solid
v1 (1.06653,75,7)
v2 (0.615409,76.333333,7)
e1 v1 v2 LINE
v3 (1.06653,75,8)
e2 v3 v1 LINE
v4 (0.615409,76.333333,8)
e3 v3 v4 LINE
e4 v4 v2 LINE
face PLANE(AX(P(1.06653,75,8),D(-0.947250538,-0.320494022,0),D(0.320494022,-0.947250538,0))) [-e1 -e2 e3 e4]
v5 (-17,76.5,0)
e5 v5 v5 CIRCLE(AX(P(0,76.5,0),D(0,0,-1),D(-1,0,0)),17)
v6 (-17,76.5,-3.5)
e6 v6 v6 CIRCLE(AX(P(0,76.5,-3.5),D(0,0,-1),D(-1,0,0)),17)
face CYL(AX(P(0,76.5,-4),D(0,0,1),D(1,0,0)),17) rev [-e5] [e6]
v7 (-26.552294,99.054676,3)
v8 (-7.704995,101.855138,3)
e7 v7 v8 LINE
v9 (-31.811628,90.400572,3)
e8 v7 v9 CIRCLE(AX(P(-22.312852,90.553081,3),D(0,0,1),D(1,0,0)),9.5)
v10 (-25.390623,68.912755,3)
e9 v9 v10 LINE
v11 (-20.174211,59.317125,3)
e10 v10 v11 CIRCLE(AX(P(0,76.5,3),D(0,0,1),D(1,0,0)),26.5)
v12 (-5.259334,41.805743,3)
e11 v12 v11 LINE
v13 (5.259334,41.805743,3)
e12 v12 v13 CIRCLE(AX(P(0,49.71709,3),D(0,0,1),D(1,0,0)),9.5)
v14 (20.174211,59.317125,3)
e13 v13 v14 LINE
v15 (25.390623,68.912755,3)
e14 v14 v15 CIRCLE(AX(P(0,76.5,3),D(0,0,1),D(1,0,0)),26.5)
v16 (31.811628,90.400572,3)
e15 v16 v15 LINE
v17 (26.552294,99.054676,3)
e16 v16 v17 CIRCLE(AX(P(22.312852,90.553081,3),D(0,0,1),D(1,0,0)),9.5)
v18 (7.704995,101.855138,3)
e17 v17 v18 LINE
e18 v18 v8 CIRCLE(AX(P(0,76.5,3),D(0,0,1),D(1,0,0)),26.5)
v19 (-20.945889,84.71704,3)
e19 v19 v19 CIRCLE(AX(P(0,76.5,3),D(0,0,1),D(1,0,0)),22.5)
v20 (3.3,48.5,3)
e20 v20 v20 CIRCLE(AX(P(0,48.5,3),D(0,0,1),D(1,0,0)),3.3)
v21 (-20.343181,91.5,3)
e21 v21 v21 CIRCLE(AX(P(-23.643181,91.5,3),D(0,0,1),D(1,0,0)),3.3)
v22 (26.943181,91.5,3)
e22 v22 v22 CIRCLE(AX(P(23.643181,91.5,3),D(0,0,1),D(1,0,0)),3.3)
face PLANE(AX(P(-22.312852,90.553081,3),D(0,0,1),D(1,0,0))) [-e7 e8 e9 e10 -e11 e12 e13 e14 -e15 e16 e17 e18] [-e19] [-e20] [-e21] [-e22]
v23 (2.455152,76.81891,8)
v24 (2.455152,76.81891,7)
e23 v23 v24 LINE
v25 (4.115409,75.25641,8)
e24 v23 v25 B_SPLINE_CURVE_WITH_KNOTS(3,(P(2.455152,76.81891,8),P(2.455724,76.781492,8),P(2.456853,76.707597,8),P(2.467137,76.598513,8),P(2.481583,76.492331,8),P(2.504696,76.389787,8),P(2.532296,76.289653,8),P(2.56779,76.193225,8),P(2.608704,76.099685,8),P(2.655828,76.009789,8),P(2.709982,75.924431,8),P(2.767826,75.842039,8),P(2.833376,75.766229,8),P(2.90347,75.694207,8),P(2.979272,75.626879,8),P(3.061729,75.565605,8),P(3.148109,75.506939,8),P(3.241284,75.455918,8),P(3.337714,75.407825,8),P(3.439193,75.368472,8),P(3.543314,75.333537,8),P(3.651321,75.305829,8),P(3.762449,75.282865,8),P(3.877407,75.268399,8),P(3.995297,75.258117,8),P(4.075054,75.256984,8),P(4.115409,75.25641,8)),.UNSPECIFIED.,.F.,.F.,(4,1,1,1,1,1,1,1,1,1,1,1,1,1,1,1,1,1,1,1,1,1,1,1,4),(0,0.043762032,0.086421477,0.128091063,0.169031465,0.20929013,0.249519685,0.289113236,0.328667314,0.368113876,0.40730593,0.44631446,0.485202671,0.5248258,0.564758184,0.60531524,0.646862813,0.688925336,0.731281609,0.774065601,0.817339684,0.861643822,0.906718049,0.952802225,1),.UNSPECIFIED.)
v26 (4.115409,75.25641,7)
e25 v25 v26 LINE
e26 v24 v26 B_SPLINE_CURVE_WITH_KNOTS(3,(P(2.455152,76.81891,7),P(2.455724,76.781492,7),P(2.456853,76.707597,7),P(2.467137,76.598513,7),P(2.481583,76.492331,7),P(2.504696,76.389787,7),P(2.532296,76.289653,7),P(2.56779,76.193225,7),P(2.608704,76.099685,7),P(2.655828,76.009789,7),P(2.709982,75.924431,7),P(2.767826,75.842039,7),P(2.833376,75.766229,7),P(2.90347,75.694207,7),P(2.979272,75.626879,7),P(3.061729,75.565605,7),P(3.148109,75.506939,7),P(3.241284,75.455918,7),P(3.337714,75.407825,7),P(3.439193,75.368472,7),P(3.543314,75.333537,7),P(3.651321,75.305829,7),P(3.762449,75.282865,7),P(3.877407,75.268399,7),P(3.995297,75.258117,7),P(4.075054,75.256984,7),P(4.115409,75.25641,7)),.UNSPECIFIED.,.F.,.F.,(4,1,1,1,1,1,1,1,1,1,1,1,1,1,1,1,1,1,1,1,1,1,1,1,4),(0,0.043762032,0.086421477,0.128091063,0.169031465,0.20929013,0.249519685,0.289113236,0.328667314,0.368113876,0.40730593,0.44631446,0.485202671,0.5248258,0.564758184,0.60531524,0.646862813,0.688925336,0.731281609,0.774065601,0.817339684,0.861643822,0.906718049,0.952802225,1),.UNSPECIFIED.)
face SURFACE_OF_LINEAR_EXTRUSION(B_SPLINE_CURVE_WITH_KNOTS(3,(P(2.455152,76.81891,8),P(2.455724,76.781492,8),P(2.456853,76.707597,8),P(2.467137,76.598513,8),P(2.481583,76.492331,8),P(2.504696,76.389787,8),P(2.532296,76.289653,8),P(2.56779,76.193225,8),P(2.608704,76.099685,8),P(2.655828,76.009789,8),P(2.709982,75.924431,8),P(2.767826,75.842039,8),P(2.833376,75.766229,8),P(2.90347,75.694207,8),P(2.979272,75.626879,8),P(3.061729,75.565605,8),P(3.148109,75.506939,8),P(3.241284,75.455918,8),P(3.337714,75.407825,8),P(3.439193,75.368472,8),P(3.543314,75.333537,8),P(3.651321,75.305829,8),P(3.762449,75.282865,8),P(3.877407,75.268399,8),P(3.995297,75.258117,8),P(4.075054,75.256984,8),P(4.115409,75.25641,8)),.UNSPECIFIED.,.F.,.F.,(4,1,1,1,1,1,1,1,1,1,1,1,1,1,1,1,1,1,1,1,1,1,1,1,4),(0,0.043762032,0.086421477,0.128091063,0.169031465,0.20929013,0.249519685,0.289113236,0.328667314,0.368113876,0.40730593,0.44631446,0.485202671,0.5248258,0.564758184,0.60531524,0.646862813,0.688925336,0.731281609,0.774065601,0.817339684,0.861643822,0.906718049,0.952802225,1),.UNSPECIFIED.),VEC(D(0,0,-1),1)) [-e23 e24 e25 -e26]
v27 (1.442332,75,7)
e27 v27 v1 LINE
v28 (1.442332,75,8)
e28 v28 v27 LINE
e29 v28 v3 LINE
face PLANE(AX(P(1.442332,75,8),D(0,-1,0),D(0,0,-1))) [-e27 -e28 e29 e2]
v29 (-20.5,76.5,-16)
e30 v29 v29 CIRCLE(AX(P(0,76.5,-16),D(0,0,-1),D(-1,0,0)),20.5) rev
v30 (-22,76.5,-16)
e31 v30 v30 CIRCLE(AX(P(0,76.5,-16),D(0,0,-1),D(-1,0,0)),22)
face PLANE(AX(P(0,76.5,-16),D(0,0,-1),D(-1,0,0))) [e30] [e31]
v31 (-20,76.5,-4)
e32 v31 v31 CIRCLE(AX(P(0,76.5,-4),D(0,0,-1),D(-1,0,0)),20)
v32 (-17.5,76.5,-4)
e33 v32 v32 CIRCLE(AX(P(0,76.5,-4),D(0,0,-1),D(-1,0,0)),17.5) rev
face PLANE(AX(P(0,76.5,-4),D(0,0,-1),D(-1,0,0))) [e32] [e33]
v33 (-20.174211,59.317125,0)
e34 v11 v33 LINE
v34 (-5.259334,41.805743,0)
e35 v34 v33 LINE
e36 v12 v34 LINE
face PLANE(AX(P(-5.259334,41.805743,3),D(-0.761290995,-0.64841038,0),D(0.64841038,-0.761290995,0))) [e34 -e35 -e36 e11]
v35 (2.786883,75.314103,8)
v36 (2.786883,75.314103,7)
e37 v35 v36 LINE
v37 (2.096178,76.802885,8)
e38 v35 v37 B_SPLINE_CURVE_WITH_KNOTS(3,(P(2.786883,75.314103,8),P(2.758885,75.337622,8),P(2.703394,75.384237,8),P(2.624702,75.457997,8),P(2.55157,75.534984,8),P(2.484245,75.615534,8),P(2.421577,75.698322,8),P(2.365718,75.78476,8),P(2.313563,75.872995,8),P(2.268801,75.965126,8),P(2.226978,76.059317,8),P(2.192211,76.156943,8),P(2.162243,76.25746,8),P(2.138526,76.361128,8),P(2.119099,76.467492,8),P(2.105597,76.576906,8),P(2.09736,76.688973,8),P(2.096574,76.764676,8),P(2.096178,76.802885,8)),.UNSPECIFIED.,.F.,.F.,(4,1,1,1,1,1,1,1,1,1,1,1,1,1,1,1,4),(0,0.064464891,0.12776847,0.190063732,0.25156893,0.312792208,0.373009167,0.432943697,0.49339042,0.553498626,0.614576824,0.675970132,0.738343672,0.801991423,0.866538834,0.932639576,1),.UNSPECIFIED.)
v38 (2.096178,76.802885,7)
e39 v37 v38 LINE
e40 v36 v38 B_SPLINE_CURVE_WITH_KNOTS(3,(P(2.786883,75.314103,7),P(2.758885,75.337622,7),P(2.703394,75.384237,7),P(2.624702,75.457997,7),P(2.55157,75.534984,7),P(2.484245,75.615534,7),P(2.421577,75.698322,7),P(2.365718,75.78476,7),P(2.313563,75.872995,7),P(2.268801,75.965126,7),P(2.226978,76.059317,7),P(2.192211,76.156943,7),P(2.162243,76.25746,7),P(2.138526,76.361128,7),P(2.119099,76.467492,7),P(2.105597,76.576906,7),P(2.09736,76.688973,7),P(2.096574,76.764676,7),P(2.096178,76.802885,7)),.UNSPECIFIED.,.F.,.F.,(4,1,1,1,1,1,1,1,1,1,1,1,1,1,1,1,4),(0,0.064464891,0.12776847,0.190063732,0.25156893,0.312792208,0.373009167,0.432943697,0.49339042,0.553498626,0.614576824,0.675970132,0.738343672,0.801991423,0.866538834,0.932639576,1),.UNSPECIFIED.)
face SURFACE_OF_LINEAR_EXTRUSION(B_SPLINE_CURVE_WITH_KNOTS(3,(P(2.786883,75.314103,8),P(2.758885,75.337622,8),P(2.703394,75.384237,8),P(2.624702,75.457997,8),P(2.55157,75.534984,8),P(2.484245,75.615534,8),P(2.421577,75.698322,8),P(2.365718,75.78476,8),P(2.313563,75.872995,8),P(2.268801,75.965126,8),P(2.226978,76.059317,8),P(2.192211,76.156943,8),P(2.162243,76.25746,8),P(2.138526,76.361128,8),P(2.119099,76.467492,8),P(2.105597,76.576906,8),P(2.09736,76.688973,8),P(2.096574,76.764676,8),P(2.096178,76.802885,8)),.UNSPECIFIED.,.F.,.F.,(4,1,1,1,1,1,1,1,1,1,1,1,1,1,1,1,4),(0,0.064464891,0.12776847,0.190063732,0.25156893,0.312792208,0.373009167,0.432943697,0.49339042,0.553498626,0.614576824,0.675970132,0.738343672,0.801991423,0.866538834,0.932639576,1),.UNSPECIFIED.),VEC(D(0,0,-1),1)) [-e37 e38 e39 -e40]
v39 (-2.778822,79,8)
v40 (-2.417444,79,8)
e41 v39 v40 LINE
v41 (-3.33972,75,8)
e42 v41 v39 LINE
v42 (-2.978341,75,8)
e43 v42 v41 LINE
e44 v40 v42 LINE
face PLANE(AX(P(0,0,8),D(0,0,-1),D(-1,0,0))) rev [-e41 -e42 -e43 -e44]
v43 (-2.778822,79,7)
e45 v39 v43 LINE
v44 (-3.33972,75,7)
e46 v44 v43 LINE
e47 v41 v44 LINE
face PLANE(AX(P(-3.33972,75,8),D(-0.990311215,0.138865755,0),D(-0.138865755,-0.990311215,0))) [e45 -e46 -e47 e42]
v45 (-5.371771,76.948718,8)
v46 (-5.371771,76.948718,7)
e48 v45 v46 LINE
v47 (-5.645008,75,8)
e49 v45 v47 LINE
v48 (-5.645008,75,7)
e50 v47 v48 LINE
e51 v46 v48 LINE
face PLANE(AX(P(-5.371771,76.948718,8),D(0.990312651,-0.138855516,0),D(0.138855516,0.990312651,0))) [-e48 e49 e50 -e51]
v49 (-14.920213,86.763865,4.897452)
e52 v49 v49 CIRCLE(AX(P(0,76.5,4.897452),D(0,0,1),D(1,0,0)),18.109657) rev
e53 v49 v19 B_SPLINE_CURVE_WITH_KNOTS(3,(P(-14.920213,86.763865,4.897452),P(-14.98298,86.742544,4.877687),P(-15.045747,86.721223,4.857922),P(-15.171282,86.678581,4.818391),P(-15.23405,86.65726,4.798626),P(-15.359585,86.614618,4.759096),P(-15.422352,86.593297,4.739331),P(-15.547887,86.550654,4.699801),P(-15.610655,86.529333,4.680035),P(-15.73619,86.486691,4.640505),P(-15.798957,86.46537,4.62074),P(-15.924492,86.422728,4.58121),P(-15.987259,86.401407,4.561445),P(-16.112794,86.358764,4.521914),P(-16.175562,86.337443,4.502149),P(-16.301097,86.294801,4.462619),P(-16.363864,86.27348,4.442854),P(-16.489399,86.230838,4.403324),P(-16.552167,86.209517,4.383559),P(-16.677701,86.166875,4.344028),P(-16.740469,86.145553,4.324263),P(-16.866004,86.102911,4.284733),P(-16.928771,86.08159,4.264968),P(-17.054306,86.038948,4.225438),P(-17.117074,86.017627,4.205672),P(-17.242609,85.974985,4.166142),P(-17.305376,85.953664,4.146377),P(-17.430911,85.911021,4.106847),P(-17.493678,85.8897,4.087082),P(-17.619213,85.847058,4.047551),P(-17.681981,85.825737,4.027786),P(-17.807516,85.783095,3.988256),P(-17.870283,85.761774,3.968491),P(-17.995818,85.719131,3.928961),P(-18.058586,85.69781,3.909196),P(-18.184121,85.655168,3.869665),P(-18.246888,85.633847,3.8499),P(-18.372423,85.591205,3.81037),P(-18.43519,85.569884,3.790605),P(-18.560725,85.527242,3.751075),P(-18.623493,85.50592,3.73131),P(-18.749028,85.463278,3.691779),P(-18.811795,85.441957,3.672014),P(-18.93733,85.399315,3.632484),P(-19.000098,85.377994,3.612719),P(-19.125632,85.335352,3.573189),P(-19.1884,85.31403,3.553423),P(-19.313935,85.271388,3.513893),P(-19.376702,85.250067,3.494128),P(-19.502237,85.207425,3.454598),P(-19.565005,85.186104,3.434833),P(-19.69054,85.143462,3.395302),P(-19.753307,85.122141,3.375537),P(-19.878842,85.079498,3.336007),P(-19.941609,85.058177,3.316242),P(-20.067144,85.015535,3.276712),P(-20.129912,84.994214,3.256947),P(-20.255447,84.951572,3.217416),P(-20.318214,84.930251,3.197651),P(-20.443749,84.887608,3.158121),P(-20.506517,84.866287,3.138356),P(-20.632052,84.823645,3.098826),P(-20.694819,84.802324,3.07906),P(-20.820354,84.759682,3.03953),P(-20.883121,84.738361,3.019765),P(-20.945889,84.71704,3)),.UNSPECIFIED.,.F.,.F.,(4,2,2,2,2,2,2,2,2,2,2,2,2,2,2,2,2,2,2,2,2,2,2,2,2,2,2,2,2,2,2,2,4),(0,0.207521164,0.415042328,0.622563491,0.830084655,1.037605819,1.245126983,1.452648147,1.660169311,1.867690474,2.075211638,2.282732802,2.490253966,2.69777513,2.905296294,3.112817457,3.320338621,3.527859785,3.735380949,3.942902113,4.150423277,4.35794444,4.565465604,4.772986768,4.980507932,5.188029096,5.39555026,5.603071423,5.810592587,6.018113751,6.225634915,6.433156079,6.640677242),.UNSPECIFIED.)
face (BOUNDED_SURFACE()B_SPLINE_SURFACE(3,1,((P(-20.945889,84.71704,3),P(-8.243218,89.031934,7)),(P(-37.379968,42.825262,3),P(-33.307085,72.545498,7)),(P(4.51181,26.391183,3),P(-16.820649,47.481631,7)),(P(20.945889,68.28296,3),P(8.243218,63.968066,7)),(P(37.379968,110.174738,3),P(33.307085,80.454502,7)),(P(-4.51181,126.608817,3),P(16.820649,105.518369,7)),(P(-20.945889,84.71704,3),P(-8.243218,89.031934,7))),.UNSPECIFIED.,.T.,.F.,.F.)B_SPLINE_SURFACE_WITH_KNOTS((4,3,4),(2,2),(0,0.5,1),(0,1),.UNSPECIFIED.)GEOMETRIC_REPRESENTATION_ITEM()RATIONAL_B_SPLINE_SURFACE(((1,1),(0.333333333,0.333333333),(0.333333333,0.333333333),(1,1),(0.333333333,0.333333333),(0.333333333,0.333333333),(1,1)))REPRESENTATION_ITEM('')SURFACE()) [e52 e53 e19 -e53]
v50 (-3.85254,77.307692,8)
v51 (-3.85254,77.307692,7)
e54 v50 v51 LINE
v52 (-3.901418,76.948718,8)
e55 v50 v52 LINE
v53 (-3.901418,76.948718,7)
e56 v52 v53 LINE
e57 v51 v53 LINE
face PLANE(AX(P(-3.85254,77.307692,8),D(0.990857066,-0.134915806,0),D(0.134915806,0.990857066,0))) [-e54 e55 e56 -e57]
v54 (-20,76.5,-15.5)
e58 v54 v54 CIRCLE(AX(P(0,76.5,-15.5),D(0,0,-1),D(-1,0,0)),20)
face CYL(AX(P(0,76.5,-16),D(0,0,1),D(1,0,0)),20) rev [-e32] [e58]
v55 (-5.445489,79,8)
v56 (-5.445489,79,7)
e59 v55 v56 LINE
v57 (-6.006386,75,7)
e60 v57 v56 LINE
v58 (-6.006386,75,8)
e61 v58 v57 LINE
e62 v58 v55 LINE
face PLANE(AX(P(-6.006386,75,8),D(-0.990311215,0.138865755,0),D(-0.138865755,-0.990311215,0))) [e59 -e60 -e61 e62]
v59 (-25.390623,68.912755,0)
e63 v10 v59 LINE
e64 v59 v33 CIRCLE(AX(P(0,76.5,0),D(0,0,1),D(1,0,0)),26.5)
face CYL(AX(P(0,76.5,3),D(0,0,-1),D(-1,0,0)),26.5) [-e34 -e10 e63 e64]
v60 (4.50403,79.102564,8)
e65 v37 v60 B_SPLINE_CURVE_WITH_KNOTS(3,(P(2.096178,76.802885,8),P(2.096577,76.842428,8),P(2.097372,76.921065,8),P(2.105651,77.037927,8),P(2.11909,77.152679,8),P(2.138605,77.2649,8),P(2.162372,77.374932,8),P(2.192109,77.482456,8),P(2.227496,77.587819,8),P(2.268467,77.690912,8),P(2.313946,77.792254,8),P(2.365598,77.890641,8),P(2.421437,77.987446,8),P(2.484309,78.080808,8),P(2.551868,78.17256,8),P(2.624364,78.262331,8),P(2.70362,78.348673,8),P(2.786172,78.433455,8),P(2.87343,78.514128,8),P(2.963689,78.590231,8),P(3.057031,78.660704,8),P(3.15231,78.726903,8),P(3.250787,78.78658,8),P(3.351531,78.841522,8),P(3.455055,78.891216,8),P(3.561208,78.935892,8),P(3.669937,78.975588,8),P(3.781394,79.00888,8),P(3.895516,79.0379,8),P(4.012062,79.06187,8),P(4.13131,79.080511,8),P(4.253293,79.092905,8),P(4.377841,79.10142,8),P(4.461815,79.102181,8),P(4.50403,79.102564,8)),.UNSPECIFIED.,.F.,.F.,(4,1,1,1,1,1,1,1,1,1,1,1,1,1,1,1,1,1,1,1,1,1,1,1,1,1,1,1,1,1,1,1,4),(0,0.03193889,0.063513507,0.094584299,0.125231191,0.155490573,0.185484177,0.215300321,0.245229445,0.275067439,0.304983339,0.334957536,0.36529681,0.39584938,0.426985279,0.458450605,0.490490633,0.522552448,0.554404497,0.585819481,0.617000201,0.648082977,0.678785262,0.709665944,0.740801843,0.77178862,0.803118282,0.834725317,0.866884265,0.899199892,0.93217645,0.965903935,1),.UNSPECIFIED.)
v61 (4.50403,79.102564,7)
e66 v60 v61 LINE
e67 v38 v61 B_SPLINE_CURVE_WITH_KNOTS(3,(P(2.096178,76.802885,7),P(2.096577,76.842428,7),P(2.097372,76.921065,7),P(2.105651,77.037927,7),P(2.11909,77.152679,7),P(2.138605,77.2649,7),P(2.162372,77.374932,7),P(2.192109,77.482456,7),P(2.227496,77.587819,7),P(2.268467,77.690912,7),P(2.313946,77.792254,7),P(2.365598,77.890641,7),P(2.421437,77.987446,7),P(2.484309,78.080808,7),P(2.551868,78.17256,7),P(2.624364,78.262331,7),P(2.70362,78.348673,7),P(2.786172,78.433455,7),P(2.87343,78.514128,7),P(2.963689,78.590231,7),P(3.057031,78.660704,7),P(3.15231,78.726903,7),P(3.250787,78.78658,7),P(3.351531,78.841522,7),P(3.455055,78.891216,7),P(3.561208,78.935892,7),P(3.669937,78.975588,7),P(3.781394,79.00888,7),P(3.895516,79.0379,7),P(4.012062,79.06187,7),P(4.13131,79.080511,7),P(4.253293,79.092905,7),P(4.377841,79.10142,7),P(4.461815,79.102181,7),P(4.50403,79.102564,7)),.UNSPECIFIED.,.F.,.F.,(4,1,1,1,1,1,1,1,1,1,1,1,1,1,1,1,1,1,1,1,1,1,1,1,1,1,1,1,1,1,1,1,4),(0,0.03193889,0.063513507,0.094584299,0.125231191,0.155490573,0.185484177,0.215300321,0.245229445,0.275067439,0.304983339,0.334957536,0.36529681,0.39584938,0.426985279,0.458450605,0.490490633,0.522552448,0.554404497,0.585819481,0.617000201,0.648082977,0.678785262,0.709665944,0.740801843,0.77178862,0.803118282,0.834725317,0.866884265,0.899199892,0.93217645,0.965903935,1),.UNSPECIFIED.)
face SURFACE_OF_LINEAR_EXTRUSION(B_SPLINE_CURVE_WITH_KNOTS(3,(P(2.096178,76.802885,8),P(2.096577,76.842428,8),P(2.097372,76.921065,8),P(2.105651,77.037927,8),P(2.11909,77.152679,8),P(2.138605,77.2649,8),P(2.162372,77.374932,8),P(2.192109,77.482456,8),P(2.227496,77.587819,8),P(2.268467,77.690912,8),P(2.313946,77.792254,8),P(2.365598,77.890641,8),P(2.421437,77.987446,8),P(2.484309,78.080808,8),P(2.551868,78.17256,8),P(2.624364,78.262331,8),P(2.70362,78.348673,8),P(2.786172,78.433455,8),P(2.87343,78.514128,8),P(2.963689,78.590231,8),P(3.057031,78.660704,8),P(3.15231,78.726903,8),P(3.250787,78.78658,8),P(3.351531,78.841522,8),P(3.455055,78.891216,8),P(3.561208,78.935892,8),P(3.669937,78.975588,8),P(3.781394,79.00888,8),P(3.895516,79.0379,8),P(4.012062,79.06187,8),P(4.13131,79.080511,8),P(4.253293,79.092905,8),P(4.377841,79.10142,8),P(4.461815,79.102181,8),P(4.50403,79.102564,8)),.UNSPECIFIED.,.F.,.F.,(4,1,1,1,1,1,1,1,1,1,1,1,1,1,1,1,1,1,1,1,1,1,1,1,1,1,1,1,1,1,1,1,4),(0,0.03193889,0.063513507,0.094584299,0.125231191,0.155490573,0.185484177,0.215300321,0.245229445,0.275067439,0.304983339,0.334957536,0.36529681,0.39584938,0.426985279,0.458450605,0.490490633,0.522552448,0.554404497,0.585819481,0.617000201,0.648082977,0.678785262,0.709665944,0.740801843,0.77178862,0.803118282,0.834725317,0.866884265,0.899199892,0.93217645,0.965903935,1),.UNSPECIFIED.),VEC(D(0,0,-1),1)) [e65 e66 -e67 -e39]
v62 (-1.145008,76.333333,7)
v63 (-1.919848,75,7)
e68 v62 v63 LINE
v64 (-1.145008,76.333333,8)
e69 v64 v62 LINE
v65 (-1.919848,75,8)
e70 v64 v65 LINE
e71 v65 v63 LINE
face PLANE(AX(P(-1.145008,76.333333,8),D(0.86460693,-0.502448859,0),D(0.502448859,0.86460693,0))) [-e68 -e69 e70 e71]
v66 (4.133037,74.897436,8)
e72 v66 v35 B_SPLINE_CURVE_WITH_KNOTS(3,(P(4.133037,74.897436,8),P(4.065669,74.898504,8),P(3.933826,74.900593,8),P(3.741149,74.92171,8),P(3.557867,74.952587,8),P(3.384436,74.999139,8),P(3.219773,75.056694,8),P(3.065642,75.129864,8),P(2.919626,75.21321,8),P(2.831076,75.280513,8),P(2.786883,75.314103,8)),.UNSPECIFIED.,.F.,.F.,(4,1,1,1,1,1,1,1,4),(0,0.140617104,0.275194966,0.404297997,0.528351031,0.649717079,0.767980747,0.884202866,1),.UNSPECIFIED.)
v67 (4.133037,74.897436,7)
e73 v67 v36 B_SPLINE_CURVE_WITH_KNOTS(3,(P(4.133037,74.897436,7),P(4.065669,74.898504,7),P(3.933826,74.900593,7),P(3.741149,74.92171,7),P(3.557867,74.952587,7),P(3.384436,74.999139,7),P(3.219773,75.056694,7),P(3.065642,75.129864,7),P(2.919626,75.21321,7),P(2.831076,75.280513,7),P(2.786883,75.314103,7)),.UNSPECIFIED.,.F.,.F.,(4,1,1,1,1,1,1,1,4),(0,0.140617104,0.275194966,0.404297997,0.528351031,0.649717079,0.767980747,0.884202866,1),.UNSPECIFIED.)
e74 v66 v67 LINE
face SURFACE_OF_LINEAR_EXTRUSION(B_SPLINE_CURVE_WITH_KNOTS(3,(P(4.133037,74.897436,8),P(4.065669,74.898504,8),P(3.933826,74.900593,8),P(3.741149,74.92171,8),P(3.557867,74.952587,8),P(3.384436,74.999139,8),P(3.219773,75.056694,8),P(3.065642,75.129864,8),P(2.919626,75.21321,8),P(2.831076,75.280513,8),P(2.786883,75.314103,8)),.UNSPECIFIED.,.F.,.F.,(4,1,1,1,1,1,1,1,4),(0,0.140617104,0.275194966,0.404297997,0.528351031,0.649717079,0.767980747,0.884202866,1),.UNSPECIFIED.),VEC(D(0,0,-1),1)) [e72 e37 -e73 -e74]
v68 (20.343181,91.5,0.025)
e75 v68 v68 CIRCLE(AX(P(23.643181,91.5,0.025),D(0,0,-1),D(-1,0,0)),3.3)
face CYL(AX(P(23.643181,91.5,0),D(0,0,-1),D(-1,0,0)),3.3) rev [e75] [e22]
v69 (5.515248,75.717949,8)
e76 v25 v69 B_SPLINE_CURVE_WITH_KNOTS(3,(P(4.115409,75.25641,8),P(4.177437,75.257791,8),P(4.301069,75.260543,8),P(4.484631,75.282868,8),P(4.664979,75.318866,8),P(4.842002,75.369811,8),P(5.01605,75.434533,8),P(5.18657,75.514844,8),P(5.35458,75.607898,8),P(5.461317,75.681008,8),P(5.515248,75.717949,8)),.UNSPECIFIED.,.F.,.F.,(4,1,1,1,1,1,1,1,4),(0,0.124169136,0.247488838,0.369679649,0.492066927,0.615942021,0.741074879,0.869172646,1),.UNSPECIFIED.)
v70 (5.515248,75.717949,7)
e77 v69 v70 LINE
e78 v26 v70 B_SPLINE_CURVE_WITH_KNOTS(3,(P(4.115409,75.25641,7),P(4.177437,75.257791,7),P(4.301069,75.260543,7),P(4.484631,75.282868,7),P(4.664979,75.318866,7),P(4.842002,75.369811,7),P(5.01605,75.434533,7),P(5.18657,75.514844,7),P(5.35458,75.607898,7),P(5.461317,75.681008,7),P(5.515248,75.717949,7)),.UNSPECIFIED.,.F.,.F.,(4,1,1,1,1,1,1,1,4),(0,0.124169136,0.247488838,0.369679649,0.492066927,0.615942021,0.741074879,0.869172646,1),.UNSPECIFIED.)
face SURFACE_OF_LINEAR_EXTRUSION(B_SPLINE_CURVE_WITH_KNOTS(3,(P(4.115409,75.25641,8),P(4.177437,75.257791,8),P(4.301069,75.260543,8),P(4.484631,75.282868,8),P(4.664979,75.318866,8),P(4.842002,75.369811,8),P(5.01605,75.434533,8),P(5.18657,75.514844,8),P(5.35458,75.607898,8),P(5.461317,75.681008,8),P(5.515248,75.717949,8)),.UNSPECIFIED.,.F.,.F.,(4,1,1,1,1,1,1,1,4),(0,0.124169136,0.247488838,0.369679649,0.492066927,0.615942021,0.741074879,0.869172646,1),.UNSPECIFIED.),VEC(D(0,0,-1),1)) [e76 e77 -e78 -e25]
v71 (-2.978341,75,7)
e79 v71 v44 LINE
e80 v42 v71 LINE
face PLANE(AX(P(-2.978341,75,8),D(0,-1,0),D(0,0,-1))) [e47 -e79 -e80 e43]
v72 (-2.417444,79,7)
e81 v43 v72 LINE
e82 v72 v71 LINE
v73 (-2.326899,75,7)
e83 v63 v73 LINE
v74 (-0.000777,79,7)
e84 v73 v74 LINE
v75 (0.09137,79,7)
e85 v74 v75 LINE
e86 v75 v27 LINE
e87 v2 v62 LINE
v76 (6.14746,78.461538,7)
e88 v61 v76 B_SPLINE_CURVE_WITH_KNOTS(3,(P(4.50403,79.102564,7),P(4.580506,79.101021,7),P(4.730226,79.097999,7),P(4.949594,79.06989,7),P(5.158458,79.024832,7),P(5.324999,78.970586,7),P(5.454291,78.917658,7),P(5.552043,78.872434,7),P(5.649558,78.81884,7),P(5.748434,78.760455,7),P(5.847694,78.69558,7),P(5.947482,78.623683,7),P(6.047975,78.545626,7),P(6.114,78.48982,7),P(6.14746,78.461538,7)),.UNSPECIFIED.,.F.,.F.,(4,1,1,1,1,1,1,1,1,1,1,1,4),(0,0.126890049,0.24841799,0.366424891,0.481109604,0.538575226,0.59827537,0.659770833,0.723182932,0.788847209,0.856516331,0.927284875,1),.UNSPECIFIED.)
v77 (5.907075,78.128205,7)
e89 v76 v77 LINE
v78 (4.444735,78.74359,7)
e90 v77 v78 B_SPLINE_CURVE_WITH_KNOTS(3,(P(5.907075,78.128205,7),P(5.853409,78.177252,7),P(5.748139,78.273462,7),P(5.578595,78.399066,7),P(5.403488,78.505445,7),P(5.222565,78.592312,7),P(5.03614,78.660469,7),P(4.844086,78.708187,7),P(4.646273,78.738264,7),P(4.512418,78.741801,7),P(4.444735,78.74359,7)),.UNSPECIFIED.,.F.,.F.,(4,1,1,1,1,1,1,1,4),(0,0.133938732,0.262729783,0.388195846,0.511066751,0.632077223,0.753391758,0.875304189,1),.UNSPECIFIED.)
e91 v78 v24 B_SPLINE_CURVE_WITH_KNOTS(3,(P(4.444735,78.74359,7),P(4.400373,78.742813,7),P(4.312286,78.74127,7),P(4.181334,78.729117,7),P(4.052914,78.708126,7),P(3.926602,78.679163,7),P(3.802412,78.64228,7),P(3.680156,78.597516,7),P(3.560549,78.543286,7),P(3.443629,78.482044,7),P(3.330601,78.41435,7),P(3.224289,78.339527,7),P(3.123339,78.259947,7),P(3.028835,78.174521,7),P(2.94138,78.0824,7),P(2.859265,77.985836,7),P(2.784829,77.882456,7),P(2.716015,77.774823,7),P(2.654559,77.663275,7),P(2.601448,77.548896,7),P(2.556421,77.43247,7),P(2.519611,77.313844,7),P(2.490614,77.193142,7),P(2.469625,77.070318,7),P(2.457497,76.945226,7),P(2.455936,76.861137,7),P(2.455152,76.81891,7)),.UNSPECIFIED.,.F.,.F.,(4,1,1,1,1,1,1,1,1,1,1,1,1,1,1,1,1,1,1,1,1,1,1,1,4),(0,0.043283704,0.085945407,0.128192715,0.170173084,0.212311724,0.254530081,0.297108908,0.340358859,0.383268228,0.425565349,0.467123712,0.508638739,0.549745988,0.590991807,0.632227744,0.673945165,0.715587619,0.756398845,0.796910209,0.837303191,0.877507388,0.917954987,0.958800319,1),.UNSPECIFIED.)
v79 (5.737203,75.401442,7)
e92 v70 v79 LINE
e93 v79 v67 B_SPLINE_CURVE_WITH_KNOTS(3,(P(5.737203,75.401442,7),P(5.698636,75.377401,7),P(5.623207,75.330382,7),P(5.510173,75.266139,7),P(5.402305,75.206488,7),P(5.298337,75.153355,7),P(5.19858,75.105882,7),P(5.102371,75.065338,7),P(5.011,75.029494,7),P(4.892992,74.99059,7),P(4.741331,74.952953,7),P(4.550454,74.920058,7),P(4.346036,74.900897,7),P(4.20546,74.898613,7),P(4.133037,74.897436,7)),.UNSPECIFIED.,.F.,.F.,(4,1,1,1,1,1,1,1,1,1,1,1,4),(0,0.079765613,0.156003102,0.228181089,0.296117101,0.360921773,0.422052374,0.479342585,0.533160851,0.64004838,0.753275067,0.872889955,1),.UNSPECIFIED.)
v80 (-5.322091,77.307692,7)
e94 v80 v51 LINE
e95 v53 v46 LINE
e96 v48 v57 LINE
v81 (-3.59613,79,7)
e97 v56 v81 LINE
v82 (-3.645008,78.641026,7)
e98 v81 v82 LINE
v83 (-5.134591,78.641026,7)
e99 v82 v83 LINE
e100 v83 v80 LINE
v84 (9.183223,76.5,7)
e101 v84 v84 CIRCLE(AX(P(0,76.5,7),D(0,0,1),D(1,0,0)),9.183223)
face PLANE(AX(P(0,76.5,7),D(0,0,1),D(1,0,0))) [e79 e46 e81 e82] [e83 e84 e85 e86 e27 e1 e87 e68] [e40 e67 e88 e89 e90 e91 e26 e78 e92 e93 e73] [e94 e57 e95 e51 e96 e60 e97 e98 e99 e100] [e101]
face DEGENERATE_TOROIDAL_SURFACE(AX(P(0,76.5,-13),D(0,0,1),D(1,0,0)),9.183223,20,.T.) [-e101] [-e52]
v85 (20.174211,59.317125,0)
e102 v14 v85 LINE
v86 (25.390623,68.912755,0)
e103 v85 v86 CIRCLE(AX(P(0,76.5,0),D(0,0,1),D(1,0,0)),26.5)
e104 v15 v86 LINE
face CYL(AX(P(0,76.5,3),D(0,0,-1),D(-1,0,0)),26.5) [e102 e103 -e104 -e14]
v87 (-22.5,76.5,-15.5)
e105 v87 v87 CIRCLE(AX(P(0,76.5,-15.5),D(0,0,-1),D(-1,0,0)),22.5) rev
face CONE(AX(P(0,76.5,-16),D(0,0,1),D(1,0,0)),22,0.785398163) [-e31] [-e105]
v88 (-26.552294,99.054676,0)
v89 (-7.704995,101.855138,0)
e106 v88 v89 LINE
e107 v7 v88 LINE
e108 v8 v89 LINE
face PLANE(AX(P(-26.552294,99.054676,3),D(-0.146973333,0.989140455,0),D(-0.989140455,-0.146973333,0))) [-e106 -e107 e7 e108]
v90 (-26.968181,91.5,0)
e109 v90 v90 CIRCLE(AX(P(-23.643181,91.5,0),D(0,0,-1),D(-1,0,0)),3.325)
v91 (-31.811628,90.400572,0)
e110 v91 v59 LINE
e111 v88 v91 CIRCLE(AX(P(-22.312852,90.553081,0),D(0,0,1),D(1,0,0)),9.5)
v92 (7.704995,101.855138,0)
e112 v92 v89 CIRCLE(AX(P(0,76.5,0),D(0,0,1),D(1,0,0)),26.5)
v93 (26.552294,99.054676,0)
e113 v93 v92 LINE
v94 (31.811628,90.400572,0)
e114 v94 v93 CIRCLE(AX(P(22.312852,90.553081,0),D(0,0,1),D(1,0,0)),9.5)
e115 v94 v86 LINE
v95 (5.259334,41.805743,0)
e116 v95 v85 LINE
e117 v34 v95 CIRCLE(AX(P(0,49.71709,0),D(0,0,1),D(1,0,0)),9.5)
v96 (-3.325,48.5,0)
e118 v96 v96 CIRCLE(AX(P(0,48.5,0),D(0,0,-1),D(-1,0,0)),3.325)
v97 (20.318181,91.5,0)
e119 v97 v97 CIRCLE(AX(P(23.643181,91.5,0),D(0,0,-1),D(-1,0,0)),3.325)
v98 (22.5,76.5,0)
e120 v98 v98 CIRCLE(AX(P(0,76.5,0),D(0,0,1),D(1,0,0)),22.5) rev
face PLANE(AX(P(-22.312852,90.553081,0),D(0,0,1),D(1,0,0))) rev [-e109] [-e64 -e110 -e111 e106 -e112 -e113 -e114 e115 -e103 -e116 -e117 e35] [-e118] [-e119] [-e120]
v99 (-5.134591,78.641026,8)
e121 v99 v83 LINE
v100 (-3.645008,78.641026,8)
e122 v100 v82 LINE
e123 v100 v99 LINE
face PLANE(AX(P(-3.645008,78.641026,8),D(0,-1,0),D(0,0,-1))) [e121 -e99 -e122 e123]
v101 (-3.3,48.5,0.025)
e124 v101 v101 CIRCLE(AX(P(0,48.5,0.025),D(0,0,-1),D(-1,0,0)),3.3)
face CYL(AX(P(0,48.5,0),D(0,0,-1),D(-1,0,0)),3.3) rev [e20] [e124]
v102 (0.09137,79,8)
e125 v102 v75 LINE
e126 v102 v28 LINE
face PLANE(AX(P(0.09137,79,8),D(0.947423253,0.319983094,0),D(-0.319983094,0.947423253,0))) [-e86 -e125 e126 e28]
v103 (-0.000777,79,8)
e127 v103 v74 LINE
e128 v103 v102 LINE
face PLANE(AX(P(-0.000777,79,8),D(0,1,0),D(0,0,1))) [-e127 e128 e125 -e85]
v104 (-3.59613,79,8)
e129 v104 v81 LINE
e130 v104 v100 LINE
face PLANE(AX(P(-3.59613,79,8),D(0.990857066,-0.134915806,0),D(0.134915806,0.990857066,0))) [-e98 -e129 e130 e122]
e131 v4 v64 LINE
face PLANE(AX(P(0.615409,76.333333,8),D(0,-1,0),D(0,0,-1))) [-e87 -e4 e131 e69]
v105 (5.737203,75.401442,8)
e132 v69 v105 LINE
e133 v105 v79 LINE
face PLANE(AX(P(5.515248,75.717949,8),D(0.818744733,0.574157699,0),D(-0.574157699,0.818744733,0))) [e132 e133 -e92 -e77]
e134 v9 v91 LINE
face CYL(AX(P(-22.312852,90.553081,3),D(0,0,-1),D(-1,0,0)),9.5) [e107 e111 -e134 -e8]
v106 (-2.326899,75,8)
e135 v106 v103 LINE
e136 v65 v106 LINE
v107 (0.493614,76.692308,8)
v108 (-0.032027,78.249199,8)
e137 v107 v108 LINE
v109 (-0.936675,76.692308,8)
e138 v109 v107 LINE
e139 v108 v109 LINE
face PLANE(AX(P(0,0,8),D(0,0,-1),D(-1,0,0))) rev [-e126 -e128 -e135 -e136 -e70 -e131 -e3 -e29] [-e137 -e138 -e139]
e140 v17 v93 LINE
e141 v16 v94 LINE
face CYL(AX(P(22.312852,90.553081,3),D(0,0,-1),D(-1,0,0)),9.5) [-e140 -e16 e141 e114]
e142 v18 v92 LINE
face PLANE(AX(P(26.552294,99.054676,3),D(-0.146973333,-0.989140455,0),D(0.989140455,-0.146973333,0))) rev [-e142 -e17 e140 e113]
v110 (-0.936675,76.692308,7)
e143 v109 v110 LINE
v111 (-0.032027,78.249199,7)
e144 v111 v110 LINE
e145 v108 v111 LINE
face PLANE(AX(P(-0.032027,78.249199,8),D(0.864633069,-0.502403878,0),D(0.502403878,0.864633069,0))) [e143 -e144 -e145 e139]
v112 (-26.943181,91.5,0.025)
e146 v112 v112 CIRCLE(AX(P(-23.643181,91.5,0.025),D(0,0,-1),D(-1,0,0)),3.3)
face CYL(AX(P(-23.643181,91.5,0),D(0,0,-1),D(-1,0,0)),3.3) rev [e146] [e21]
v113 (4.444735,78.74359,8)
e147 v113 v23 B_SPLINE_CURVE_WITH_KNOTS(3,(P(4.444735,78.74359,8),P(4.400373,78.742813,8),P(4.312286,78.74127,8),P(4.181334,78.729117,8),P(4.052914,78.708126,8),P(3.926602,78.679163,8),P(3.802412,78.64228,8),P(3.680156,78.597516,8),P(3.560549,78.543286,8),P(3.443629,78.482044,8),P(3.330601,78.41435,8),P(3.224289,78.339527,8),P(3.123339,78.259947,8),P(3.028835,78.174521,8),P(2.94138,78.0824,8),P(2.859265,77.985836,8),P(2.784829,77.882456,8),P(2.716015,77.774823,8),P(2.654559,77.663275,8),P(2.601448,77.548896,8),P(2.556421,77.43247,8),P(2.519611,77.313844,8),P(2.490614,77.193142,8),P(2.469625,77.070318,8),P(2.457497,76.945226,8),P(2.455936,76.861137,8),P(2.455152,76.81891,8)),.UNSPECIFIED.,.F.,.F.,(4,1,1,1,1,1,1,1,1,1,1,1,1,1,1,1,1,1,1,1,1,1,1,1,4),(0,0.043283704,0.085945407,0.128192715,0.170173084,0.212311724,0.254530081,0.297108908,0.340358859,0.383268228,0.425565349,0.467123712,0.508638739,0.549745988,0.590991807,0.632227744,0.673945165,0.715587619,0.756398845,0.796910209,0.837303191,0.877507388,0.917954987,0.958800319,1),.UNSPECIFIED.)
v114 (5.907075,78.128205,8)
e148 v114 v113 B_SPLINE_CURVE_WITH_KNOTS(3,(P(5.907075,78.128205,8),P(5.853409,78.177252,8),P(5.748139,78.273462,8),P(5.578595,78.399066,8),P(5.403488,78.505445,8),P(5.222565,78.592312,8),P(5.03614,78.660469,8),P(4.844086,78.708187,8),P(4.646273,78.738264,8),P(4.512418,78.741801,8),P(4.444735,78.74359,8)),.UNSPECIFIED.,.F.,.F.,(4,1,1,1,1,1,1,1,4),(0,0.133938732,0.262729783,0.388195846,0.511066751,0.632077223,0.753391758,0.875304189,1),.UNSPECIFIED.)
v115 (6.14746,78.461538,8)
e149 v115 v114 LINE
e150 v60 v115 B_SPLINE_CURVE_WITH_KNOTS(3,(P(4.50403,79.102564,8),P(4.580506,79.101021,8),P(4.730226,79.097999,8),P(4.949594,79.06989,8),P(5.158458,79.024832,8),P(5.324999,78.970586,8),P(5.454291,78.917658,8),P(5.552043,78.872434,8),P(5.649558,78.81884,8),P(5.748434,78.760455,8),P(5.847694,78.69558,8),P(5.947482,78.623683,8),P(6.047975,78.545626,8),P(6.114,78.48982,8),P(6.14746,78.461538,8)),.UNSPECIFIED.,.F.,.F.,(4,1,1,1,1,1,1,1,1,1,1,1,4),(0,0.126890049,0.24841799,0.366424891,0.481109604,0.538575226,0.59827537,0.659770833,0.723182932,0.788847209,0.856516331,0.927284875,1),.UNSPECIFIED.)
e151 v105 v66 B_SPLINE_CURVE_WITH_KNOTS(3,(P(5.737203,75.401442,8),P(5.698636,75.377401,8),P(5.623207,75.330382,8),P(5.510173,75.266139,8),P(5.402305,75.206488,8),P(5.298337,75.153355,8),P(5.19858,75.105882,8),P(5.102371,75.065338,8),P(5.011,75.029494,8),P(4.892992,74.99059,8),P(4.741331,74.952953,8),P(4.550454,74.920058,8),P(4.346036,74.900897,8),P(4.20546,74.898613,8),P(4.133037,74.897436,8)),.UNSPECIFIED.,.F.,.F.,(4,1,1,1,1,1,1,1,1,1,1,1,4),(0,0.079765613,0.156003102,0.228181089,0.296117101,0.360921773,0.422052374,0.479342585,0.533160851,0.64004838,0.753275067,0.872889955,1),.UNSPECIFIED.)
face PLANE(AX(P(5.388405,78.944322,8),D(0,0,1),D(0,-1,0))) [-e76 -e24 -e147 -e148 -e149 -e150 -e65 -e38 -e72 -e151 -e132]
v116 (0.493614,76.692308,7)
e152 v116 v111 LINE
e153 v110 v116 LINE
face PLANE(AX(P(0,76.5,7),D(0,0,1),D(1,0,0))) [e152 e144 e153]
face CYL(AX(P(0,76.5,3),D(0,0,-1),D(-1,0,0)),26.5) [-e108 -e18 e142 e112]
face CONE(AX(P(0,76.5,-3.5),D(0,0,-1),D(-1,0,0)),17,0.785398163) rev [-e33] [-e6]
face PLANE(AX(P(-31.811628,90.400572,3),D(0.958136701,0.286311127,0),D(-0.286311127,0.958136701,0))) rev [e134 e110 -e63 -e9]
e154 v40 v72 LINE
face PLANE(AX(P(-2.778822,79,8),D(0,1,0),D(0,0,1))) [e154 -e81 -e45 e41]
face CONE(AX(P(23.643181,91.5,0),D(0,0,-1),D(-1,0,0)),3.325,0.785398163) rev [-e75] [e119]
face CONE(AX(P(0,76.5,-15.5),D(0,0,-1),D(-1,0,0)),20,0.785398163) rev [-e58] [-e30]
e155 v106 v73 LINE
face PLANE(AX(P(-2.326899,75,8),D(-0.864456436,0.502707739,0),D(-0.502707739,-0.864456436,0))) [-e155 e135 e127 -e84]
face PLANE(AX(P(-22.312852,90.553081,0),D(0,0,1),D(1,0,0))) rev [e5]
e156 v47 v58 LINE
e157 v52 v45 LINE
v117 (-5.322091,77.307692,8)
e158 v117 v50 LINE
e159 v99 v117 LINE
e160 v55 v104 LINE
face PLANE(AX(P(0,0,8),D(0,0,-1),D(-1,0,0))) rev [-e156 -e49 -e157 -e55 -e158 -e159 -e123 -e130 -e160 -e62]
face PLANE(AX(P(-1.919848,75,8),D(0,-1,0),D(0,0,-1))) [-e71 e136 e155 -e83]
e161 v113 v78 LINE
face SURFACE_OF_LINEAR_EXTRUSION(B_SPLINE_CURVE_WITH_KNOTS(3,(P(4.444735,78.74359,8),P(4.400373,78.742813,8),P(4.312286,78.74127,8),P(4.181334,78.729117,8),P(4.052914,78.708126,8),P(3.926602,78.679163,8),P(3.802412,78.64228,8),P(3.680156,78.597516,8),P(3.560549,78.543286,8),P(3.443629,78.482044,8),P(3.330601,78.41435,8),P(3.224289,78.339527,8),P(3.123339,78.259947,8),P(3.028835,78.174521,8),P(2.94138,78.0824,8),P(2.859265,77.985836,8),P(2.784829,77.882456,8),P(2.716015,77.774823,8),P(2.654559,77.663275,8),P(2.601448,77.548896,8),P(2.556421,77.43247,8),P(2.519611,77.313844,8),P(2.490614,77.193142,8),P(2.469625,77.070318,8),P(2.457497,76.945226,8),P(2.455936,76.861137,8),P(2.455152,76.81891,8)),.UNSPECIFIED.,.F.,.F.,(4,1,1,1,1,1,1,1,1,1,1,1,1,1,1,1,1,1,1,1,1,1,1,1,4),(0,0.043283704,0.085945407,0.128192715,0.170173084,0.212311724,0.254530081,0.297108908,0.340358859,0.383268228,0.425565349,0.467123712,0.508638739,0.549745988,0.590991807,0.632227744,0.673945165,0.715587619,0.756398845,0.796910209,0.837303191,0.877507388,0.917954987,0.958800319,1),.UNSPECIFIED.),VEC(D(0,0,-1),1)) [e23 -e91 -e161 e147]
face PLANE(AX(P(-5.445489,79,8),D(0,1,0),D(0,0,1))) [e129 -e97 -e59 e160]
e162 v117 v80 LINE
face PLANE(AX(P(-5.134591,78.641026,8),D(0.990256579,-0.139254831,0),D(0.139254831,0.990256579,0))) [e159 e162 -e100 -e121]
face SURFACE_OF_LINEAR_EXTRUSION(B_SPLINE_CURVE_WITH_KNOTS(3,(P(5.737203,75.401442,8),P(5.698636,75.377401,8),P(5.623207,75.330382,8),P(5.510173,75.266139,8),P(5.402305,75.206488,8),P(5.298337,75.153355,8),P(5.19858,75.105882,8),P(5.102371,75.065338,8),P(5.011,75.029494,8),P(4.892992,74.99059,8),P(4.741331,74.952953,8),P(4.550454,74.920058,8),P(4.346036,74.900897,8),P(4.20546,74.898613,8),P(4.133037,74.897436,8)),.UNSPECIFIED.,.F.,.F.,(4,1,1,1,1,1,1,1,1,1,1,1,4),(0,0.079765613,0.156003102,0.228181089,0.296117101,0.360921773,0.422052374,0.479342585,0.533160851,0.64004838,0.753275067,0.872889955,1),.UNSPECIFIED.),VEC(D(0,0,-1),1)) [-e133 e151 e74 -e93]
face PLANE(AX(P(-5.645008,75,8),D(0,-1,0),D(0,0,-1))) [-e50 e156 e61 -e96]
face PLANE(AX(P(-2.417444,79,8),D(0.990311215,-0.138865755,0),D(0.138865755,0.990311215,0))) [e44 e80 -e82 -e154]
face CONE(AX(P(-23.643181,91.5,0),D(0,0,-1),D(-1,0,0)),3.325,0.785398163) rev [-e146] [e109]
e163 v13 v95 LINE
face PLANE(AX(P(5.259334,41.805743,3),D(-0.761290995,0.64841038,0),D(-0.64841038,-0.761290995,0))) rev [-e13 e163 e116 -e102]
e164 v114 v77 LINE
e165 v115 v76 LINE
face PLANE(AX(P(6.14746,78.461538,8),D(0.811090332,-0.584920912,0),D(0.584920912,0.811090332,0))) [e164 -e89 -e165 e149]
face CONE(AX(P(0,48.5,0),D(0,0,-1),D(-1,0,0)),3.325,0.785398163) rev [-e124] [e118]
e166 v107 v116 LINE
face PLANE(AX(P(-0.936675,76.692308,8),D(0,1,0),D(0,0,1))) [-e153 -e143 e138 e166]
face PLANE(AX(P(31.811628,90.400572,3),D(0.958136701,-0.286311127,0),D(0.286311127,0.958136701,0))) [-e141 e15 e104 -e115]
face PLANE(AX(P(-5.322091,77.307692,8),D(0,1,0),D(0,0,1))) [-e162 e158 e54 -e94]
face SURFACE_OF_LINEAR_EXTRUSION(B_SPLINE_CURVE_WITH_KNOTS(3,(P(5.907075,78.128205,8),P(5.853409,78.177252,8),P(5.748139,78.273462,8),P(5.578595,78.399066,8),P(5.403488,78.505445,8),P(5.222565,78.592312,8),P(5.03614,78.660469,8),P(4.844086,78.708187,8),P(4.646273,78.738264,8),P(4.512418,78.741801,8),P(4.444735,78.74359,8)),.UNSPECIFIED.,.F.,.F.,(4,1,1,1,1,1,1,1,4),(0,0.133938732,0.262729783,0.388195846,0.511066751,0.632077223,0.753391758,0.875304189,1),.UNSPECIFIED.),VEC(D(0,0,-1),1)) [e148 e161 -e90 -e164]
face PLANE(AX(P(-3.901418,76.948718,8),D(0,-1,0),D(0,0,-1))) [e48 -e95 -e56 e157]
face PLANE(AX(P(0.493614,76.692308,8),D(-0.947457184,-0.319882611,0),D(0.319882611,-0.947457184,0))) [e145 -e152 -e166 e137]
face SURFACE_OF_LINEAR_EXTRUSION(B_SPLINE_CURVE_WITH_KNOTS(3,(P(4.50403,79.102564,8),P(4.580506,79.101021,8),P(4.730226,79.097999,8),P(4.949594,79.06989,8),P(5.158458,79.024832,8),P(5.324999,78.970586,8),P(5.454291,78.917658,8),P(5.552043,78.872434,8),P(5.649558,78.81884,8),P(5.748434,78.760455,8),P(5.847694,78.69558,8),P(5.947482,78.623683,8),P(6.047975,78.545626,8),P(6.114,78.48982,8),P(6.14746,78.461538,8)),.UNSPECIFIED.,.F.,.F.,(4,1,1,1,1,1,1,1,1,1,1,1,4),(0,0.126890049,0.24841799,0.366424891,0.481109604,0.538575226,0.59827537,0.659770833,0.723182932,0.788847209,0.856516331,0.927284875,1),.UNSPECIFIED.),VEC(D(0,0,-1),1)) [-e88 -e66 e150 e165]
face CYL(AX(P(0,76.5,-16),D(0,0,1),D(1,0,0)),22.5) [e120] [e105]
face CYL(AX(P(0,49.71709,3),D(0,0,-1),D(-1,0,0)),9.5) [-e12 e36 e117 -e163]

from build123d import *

# Parameters (mm, degrees)
ESTRUSIONE_ESTRUSIONE2_DEPTH   = 3
RACCORDO1_R                    = 20
FORO_PER_VITE_M6_1_D           = 6.6
FORO_PER_VITE_M6_1_CSINK_D     = 6.65
FORO_PER_VITE_M6_1_CSINK_ANGLE = 90
ESTRUSIONE_ESTRUSIONE4_DEPTH   = 1
SCHIZZO13_R                    = 22.5
SCHIZZO13_R_2                  = 20
ESTRUSIONE_ESTRUSIONE5_DEPTH   = 16
SMUSSO1_SIZE                   = 0.5
SCHIZZO14_R                    = 20
SCHIZZO14_R_2                  = 17
ESTRUSIONE_ESTRUSIONE6_DEPTH   = 4
SMUSSO2_SIZE                   = 0.5


with BuildPart() as part:
    # Schizzo2 → Estrusione-Estrusione2 (new body)
    with BuildSketch(Plane.XY):
        with BuildLine():
            Line((31.811628146, 90.400572067), (25.390622586, 68.91275513))
            ThreePointArc((25.390622586, 68.91275513), (23.282129475, 63.843284505), (20.174211359, 59.317124919))
            Line((20.174211359, 59.317124919), (5.259333821, 41.805742776))
            ThreePointArc((5.259333821, 41.805742776), (0, 40.217089549), (-5.259333821, 41.805742776))
            Line((-5.259333821, 41.805742776), (-20.174211359, 59.317124919))
            ThreePointArc((-20.174211359, 59.317124919), (-23.282129475, 63.843284505), (-25.390622586, 68.91275513))
            Line((-25.390622586, 68.91275513), (-31.811628146, 90.400572067))
            ThreePointArc((-31.811628146, 90.400572067), (-30.431228874, 95.486838044), (-26.552294326, 99.054676397))
            Line((-26.552294326, 99.054676397), (-7.704995257, 101.855138495))
            ThreePointArc((-7.704995257, 101.855138495), (0, 103), (7.704995257, 101.855138495))
            Line((7.704995257, 101.855138495), (26.552294326, 99.054676397))
            ThreePointArc((26.552294326, 99.054676397), (30.431228874, 95.486838044), (31.811628146, 90.400572067))
        make_face()
    extrude(amount=ESTRUSIONE_ESTRUSIONE2_DEPTH)

    # Loft1: read off the stored shape, not the designer's step
    # Loft1: loft between two sections, ruled curve by curve
    loft1_from = [
        Edge.make_bspline([(-20.945888845, 84.717039643, 3), (-37.37996813, 42.825261952, 3), (4.51180956, 26.391182667, 3), (20.945888845, 68.282960357, 3), (37.37996813, 110.174738048, 3), (-4.51180956, 126.608817333, 3), (-20.945888845, 84.717039643, 3)], [0, 0, 0, 0, 0.5, 0.5, 0.5, 1, 1, 1, 1], 3, [1, 0.333333333, 0.333333333, 1, 0.333333333, 0.333333333, 1]),
    ]
    loft1_to = [
        Edge.make_bspline([(-8.243217943, 89.031933528, 7), (-33.307084999, 72.545497643, 7), (-16.820649113, 47.481630587, 7), (8.243217943, 63.968066472, 7), (33.307084999, 80.454502357, 7), (16.820649113, 105.518369413, 7), (-8.243217943, 89.031933528, 7)], [0, 0, 0, 0, 0.5, 0.5, 0.5, 1, 1, 1, 1], 3, [1, 0.333333333, 0.333333333, 1, 0.333333333, 0.333333333, 1]),
    ]
    loft1 = Solid(Shell([*[Face.make_surface_from_curves(loft1_from[k], loft1_to[k]) for k in range(1)], Face(Wire(loft1_from)), Face(Wire(loft1_to))]))
    add(loft1)

    # Raccordo1
    raccordo1_edges = [part.edges().sort_by_distance(p)[0] for p in [
        (8.243217943, 63.968066472, 7),
    ]]
    fillet(raccordo1_edges, radius=RACCORDO1_R)

    # Foro per Vite M6-1 (through all)
    with Locations(Plane(origin=(0, 0, 0), x_dir=(-1, 0, 0), z_dir=(0, 0, -1))):
        with Locations((-23.643180835, 91.5), (23.643180835, 91.5), (0, 48.5)):
            CounterSinkHole(FORO_PER_VITE_M6_1_D / 2, FORO_PER_VITE_M6_1_CSINK_D / 2, counter_sink_angle=FORO_PER_VITE_M6_1_CSINK_ANGLE)

    # Schizzo12 → Estrusione-Estrusione4 (add)
    # profile 1 of 4: a face of its own
    with BuildSketch(Plane.XY.offset(7)):
        Polygon((-3.596129901, 79), (-3.645008106, 78.641025641), (-5.13459144, 78.641025641), (-5.32209144, 77.307692308), (-3.852540158, 77.307692308), (-3.901418363, 76.948717949), (-5.371770927, 76.948717949), (-5.645008106, 75), (-6.006386312, 75), (-5.445488876, 79), align=None)
    # profile 2 of 4: a face of its own
    with BuildSketch(Plane.XY.offset(7)):
        Polygon((-2.778822209, 79), (-2.417444004, 79), (-2.97834144, 75), (-3.339719645, 75), align=None)
    # profile 3 of 4: a face of its own
    with BuildSketch(Plane.XY.offset(7)):
        Polygon((0.091370099, 79), (1.442331637, 75), (1.066530355, 75), (0.61540856, 76.333333333), (-1.145008106, 76.333333333), (-1.91984785, 75), (-2.326899132, 75), (-0.000777337, 79), align=None)
        Polygon((-0.032027337, 78.249198718), (-0.936674773, 76.692307692), (0.493613688, 76.692307692), align=None, mode=Mode.SUBTRACT)
    # profile 4 of 4: a face of its own
    with BuildSketch(Plane.XY.offset(7)):
        with BuildLine():
            Line((6.147459842, 78.461538462), (5.907075227, 78.128205128))
            add(Edge.make_bspline(
                [(5.907075227, 78.128205128), (5.853409068, 78.177252377), (5.748139309, 78.273461837), (5.57859512, 78.399066357), (5.403488099, 78.505445152), (5.22256522, 78.592311905), (5.036140145, 78.660469488), (4.844086397, 78.708187014), (4.646272643, 78.738264389), (4.512418126, 78.741801319), (4.444735483, 78.743589744)],
                knots=[0, 0, 0, 0, 1.071509858, 2.101838265, 3.105566767, 4.088534008, 5.056617788, 6.027134063, 7.002433514, 8, 8, 8, 8], degree=3))
            add(Edge.make_bspline(
                [(4.444735483, 78.743589744), (4.400373208, 78.742812621), (4.312286158, 78.741269543), (4.181334262, 78.729117344), (4.052913927, 78.708126456), (3.926602012, 78.679162503), (3.802411907, 78.64228048), (3.680155963, 78.597516258), (3.56054902, 78.543286131), (3.443628937, 78.482044458), (3.330601048, 78.414350152), (3.22428905, 78.33952652), (3.12333878, 78.259946704), (3.028834556, 78.174521349), (2.941380069, 78.082399604), (2.859264786, 77.98583622), (2.78482907, 77.882456135), (2.716015178, 77.774823109), (2.654558753, 77.663275365), (2.601448097, 77.548895655), (2.556421412, 77.432470171), (2.519611274, 77.31384374), (2.490613909, 77.193141896), (2.46962503, 77.070318011), (2.457497057, 76.945226207), (2.455936033, 76.861136633), (2.45515215, 76.818910256)],
                knots=[0, 0, 0, 0, 1.038808894, 2.06268977, 3.07662516, 4.084154014, 5.095481367, 6.108721937, 7.130613802, 8.168612606, 9.198437467, 10.213568377, 11.210969095, 12.207329739, 13.193903721, 14.183803377, 15.173465855, 16.174683957, 17.174102854, 18.153572289, 19.125845025, 20.09527659, 21.060177321, 22.030919679, 23.011207659, 24, 24, 24, 24], degree=3))
            add(Edge.make_bspline(
                [(2.45515215, 76.818910256), (2.455723998, 76.781491738), (2.456853287, 76.707597462), (2.467137224, 76.598513496), (2.481582904, 76.492331052), (2.504695805, 76.389786519), (2.532296075, 76.289652842), (2.567790414, 76.19322547), (2.608704098, 76.099685037), (2.655827766, 76.009788748), (2.709981947, 75.9244307), (2.767825544, 75.84203868), (2.833376205, 75.766228724), (2.903469648, 75.69420712), (2.979271851, 75.626878672), (3.06172917, 75.565604987), (3.148109174, 75.50693934), (3.241284048, 75.455918021), (3.337713946, 75.407825191), (3.439192633, 75.368472345), (3.543314355, 75.333536855), (3.651321135, 75.30582883), (3.762449094, 75.282865419), (3.877406714, 75.268399012), (3.995297146, 75.258117436), (4.075054043, 75.256983827), (4.11540856, 75.256410256)],
                knots=[0, 0, 0, 0, 1.050288761, 2.074115449, 3.074185512, 4.056755159, 5.022963132, 5.98847243, 6.938717655, 7.888015535, 8.834733031, 9.775342319, 10.711547043, 11.644864095, 12.595819208, 13.554196408, 14.527565762, 15.524707521, 16.534208059, 17.550758617, 18.577574426, 19.616152416, 20.679451723, 21.761233178, 22.867253411, 24, 24, 24, 24], degree=3))
            add(Edge.make_bspline(
                [(4.11540856, 75.256410256), (4.177436651, 75.257790942), (4.301068501, 75.260542869), (4.484631477, 75.282868048), (4.664978891, 75.318865819), (4.842002444, 75.369810901), (5.016050431, 75.43453316), (5.186569599, 75.514843771), (5.354579597, 75.607897574), (5.461316993, 75.681008093), (5.515248304, 75.717948718)],
                knots=[0, 0, 0, 0, 0.99335309, 1.979910703, 2.957437189, 3.936535413, 4.927536167, 5.928599034, 6.953381172, 8, 8, 8, 8], degree=3))
            Line((5.515248304, 75.717948718), (5.737203432, 75.401442308))
            add(Edge.make_bspline(
                [(5.737203432, 75.401442308), (5.698636022, 75.377400999), (5.623207082, 75.330381758), (5.510173423, 75.266138874), (5.402305276, 75.206488418), (5.298337121, 75.153355463), (5.198579513, 75.105882334), (5.1023715, 75.065337735), (5.011000051, 75.029494384), (4.892992217, 74.990590306), (4.74133145, 74.952952634), (4.550453852, 74.92005811), (4.346035685, 74.900897129), (4.205459903, 74.898612773), (4.133036765, 74.897435897)],
                knots=[0, 0, 0, 0, 0.95718736, 1.872037221, 2.738173064, 3.553405217, 4.331061281, 5.064628489, 5.752111019, 6.397930214, 7.680580555, 9.03930081, 10.474679465, 12, 12, 12, 12], degree=3))
            add(Edge.make_bspline(
                [(4.133036765, 74.897435897), (4.065668797, 74.898503504), (3.933826188, 74.900592864), (3.741149364, 74.921710204), (3.557866827, 74.95258651), (3.384436033, 74.999139462), (3.219772984, 75.056693596), (3.065642403, 75.129864143), (2.919625803, 75.213209751), (2.831076482, 75.280512719), (2.786882919, 75.314102564)],
                knots=[0, 0, 0, 0, 1.124936831, 2.201559726, 3.234383979, 4.226808245, 5.197736629, 6.143845973, 7.073622924, 8, 8, 8, 8], degree=3))
            add(Edge.make_bspline(
                [(2.786882919, 75.314102564), (2.758885291, 75.337621958), (2.703394402, 75.384237053), (2.62470229, 75.457997227), (2.551570012, 75.534983994), (2.484244847, 75.615533524), (2.42157733, 75.698321851), (2.365717698, 75.784759584), (2.313562827, 75.872994881), (2.268800829, 75.96512557), (2.22697839, 76.059317323), (2.192210864, 76.156942995), (2.16224319, 76.257459522), (2.138526146, 76.361127608), (2.119099109, 76.4674919), (2.105596966, 76.576905953), (2.097360113, 76.688973096), (2.09657437, 76.764675934), (2.096177791, 76.802884615)],
                knots=[0, 0, 0, 0, 1.031438255, 2.044295521, 3.04101972, 4.02510288, 5.004675323, 5.96814667, 6.927099159, 7.894246712, 8.855978008, 9.833229186, 10.815522105, 11.813498757, 12.831862773, 13.86462134, 14.922233219, 16, 16, 16, 16], degree=3))
            add(Edge.make_bspline(
                [(2.096177791, 76.802884615), (2.096577495, 76.842428296), (2.097372344, 76.921064649), (2.105650778, 77.037926676), (2.119089644, 77.152678707), (2.138604556, 77.264900109), (2.162372252, 77.374931575), (2.192108962, 77.482456198), (2.227496183, 77.587819052), (2.26846739, 77.690912174), (2.313946089, 77.792253604), (2.365597569, 77.890641468), (2.421437188, 77.987446425), (2.484309495, 78.080807656), (2.551867712, 78.172560242), (2.624363598, 78.262330978), (2.703619519, 78.348673131), (2.786172336, 78.433454544), (2.873429547, 78.514127778), (2.963688628, 78.590231175), (3.057030633, 78.660704389), (3.152310494, 78.726903249), (3.250787182, 78.786579776), (3.351531447, 78.841522422), (3.455054871, 78.891215855), (3.561207816, 78.935892226), (3.669937102, 78.975588021), (3.781394211, 79.008879856), (3.895516006, 79.0378999), (4.012061865, 79.061869924), (4.131310009, 79.08051087), (4.253292706, 79.092904794), (4.377840673, 79.101419939), (4.461815011, 79.102181335), (4.504030355, 79.102564103)],
                knots=[0, 0, 0, 0, 1.022044487, 2.032432208, 3.026697584, 4.007398125, 4.975698324, 5.935493653, 6.889610259, 7.847342231, 8.802158043, 9.759466851, 10.718641154, 11.689497925, 12.667180171, 13.663528933, 14.670419348, 15.695700261, 16.721678344, 17.740943913, 18.746223377, 19.744006424, 20.738655278, 21.721128384, 22.709310215, 23.705658978, 24.697235847, 25.699785021, 26.711210149, 27.740296491, 28.77439654, 29.829646392, 30.908925919, 32, 32, 32, 32], degree=3))
            add(Edge.make_bspline(
                [(4.504030355, 79.102564103), (4.580506116, 79.101020619), (4.730225931, 79.097998876), (4.949594324, 79.069889673), (5.158458449, 79.024831724), (5.324999268, 78.970585793), (5.454290614, 78.917658056), (5.552043217, 78.87243398), (5.649557753, 78.818839919), (5.748433722, 78.760454716), (5.84769365, 78.695580135), (5.947481515, 78.623682671), (6.04797544, 78.545625981), (6.1139998, 78.48982), (6.147459842, 78.461538462)],
                knots=[0, 0, 0, 0, 1.522680585, 2.981015879, 4.397098697, 5.773315249, 6.462902712, 7.179304435, 7.917249996, 8.678195189, 9.466166505, 10.278195975, 11.127418496, 12, 12, 12, 12], degree=3))
        make_face()
    extrude(amount=ESTRUSIONE_ESTRUSIONE4_DEPTH)

    # Schizzo13 → Estrusione-Estrusione5 (add)
    with BuildSketch(Plane(origin=(0, 0, 0), x_dir=(-1, 0, 0), z_dir=(0, 0, -1))):
        with Locations(Location((0, 76.5, 0), (0, 0, 180))):
            Circle(SCHIZZO13_R)
        with Locations((0, 76.5)):
            Circle(SCHIZZO13_R_2, mode=Mode.SUBTRACT)
    extrude(amount=ESTRUSIONE_ESTRUSIONE5_DEPTH)

    # Smusso1
    smusso1_edges = [part.edges().sort_by_distance(p)[0] for p in [
        (-22.5, 76.5, -16),
        (20, 76.5, -16),
    ]]
    chamfer(smusso1_edges, length=SMUSSO1_SIZE)

    # Schizzo14 → Estrusione-Estrusione6 (add)
    with BuildSketch(Plane(origin=(0, 0, 0), x_dir=(-1, 0, 0), z_dir=(0, 0, -1))):
        with Locations((0, 76.5)):
            Circle(SCHIZZO14_R)
        with Locations((0, 76.5)):
            Circle(SCHIZZO14_R_2, mode=Mode.SUBTRACT)
    extrude(amount=ESTRUSIONE_ESTRUSIONE6_DEPTH)

    # Smusso2
    smusso2_edges = [part.edges().sort_by_distance(p)[0] for p in [
        (17, 76.5, -4),
    ]]
    chamfer(smusso2_edges, length=SMUSSO2_SIZE)


solid = part.part
